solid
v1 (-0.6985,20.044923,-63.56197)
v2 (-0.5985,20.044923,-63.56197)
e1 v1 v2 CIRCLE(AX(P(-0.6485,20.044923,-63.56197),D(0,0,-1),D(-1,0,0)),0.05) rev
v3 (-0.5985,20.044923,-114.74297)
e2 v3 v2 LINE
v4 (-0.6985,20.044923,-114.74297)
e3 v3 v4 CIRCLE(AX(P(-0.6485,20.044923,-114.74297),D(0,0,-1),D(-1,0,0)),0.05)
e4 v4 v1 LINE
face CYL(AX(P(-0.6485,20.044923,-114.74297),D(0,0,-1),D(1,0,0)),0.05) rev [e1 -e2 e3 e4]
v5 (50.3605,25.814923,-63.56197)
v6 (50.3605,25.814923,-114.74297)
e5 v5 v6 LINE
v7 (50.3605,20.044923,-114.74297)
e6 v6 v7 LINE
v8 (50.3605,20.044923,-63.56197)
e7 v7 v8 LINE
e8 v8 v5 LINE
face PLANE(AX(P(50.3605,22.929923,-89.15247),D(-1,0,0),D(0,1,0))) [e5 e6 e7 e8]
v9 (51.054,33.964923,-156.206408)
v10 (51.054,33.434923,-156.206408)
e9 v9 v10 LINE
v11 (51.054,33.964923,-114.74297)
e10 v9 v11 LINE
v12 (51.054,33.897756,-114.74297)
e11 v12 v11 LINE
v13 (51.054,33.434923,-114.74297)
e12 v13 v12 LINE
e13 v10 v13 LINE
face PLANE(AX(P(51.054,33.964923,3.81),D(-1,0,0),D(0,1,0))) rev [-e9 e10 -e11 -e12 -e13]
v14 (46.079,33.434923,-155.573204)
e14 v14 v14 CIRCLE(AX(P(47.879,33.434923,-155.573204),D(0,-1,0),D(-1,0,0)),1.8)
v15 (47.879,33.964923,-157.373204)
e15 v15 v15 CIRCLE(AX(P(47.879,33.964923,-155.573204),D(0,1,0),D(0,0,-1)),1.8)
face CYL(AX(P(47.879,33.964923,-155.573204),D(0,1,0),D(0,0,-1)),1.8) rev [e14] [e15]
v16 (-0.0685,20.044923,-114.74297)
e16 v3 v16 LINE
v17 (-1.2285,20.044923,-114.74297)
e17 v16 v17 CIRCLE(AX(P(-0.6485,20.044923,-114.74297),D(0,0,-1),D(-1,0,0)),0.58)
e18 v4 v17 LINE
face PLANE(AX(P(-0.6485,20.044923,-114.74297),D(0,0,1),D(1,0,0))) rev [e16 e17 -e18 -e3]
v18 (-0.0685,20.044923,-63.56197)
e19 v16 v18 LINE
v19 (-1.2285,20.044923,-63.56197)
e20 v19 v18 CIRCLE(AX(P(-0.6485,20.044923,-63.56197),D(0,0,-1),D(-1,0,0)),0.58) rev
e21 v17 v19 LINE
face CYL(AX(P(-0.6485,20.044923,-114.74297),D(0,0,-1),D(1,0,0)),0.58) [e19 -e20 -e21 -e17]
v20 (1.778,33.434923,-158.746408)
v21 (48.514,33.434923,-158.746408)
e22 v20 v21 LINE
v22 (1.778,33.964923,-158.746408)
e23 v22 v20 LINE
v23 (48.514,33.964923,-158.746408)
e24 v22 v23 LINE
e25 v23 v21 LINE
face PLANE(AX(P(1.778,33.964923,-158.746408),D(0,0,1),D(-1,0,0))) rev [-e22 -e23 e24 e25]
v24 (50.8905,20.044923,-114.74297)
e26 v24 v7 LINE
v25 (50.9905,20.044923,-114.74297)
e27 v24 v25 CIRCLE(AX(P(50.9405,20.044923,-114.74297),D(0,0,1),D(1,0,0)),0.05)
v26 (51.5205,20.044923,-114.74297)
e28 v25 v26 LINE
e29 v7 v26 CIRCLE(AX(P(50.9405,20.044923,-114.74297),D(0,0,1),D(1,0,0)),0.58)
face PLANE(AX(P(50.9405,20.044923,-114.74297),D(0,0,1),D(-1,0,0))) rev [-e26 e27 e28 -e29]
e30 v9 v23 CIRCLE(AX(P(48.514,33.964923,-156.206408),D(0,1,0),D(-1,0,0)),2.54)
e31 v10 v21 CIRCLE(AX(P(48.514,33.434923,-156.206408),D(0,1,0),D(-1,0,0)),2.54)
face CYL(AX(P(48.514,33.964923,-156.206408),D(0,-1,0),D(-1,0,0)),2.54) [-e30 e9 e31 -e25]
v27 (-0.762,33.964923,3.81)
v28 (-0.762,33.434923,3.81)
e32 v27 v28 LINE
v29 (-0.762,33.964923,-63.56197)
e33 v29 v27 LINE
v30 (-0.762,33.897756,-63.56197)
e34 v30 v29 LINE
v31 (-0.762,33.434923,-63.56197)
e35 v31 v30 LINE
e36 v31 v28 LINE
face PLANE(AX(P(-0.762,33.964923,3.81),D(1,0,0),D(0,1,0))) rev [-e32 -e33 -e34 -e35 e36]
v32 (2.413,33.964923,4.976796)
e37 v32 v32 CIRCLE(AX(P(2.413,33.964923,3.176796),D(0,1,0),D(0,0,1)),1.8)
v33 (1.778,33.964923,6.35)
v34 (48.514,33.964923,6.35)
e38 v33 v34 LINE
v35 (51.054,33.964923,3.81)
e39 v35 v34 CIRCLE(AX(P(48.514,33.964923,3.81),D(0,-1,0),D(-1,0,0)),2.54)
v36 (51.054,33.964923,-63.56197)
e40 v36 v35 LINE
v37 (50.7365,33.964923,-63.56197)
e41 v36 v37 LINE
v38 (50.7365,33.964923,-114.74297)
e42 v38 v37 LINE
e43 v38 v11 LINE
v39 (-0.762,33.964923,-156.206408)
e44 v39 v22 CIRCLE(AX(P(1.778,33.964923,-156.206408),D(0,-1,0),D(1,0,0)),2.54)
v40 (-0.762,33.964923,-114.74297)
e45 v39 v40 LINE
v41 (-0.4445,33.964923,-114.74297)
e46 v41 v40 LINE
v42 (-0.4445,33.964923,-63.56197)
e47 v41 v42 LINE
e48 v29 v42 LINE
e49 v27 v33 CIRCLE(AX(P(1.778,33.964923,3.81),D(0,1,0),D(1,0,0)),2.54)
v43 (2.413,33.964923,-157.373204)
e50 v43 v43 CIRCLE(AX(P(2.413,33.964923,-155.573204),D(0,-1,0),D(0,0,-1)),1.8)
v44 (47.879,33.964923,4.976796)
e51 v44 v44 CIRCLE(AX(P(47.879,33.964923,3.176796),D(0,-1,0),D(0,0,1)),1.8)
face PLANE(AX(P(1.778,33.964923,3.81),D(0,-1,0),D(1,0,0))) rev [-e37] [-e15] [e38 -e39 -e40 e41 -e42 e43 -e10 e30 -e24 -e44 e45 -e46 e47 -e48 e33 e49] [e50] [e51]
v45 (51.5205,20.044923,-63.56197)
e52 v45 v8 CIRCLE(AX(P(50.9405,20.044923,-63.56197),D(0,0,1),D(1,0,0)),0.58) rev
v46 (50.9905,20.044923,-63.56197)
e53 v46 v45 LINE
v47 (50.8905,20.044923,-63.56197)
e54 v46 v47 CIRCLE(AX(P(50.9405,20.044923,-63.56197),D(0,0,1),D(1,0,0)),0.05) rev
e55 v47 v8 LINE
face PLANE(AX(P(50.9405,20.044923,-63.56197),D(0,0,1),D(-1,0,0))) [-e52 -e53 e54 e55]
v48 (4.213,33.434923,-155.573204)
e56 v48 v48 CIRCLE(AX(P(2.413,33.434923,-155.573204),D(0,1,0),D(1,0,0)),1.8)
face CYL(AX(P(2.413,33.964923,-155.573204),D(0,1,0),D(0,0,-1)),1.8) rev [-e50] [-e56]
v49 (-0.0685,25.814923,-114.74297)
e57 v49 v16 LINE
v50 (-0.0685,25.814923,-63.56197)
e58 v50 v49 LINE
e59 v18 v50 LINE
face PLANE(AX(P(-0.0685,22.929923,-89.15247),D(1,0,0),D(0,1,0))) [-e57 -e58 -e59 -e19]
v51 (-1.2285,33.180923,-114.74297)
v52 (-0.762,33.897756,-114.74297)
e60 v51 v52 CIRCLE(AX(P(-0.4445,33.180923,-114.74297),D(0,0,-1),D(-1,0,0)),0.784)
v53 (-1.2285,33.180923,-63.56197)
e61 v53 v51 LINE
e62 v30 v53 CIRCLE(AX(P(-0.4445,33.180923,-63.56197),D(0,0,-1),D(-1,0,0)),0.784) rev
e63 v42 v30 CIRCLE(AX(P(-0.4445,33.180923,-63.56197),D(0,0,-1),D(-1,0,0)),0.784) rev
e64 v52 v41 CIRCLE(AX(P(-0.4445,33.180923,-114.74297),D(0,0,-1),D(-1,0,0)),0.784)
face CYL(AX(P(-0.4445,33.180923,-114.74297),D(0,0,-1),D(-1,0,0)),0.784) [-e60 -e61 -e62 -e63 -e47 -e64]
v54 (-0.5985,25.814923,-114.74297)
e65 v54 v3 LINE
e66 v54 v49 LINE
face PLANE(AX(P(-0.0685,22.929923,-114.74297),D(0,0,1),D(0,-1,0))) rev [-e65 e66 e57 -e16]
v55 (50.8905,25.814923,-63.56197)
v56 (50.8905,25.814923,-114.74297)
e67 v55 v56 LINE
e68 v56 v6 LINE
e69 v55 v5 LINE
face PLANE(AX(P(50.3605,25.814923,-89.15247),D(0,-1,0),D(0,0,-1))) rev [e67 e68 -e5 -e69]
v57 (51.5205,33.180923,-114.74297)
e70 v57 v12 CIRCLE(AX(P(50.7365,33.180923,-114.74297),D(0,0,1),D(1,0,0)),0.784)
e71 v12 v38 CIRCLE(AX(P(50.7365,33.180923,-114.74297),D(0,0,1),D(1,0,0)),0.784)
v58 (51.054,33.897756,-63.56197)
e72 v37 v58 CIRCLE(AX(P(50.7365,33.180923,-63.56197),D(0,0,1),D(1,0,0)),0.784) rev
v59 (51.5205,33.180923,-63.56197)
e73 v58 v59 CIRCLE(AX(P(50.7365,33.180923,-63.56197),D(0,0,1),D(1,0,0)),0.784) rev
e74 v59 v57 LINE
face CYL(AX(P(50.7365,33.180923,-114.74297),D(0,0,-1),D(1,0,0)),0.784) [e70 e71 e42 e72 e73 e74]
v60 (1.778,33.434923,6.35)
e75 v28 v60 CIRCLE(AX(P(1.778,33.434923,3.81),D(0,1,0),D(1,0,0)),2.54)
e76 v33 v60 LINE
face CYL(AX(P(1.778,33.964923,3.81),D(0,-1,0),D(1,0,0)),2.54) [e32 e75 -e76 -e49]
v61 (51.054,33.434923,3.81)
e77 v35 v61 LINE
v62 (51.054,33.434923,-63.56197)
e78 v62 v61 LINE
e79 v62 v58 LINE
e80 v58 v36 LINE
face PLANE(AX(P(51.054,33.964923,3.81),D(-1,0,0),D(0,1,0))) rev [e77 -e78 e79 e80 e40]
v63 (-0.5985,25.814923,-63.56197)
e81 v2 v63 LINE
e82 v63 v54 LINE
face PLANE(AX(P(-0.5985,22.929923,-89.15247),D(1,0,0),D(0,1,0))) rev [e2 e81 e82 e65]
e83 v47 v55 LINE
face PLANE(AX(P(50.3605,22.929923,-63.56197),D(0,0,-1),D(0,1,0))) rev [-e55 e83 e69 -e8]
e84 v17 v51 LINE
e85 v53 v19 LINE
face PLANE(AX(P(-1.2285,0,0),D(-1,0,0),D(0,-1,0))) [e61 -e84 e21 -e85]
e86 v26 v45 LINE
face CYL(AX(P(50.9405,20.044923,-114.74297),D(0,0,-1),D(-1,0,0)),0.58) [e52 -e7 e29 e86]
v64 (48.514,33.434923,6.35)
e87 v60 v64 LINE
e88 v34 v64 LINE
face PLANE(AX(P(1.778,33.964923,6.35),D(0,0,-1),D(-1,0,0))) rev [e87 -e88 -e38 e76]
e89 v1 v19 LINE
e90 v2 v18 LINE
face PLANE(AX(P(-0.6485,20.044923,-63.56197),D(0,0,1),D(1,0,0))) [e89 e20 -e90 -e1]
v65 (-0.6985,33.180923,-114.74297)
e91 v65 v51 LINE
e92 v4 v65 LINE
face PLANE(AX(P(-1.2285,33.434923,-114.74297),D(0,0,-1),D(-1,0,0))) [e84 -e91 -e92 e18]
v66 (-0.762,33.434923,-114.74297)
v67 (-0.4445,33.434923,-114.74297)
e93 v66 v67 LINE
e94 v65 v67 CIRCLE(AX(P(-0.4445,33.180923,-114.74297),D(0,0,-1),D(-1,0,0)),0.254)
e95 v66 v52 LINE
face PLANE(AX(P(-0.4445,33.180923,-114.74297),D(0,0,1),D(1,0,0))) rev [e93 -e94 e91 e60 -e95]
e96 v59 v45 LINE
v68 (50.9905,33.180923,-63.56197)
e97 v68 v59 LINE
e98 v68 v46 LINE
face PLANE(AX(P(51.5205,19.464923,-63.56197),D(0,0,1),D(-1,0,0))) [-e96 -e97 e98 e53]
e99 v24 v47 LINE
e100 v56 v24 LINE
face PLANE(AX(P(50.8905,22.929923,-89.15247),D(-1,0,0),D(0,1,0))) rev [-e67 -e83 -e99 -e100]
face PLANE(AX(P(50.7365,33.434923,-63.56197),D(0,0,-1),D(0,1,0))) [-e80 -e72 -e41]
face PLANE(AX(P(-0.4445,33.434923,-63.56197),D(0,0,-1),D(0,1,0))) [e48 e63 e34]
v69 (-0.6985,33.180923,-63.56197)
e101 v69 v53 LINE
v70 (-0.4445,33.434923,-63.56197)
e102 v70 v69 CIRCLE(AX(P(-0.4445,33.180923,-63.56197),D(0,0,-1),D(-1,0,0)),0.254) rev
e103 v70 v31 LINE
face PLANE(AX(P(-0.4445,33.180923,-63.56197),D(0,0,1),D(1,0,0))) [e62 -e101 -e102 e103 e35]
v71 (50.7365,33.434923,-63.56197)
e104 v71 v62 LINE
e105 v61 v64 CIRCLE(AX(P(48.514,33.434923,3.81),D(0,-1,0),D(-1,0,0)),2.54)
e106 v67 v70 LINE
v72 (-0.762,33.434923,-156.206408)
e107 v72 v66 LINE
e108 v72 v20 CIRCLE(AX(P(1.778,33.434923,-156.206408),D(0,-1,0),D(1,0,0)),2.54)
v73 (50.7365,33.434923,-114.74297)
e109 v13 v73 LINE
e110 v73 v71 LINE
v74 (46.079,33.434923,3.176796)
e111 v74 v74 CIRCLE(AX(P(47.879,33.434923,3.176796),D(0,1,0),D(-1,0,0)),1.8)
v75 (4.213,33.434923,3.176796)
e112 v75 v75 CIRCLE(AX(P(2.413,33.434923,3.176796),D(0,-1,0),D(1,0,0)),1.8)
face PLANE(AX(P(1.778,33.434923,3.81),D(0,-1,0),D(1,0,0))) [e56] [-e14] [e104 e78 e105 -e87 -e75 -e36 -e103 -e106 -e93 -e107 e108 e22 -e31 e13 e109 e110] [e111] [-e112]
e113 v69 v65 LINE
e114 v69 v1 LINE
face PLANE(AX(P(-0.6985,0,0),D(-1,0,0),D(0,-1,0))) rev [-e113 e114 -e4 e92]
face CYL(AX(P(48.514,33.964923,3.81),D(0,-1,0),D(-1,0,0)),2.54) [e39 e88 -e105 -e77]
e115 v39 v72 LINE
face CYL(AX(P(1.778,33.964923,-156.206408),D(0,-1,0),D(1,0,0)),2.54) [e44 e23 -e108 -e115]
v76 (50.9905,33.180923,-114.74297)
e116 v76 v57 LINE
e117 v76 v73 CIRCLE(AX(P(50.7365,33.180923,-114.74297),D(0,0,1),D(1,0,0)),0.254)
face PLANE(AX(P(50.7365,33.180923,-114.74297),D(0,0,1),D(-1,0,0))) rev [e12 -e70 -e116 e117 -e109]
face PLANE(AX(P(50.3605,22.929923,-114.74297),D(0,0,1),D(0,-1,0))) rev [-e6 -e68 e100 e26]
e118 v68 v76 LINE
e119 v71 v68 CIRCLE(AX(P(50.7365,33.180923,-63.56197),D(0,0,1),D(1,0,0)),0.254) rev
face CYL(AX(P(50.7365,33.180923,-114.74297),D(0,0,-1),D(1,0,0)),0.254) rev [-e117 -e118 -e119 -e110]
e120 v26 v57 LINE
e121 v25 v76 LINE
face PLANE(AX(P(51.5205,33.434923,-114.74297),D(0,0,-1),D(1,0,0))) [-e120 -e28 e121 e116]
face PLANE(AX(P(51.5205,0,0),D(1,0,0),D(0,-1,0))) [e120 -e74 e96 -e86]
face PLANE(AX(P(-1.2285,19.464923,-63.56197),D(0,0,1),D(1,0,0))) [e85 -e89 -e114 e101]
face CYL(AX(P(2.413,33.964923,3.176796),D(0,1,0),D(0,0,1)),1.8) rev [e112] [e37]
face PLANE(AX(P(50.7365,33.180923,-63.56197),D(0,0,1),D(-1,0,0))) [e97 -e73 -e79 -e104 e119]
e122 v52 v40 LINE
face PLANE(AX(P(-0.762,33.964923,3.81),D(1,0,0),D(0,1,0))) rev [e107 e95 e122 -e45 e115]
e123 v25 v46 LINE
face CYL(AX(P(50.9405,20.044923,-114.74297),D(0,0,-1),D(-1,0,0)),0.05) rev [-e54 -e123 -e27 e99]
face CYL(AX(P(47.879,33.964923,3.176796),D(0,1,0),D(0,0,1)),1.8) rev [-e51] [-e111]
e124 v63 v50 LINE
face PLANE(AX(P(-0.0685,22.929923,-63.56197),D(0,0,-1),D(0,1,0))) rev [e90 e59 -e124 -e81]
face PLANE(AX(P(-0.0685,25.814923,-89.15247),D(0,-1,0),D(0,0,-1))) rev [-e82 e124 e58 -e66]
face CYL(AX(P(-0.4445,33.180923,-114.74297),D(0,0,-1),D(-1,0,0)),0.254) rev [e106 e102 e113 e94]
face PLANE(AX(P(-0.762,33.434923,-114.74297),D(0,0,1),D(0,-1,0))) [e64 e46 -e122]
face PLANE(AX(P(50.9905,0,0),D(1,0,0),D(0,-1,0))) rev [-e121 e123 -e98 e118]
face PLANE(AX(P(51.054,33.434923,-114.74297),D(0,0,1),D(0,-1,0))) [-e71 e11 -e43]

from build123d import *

# Parameters (mm, degrees)
BASE_FLANGE1_DEPTH           = 0.53
M3_CLEARANCE_HOLE1_D         = 3.6
EDGE_FLANGE1_STRIP_W         = 2.6915
EDGE_FLANGE1_STRIP_H         = 0.53
EDGE_FLANGE1_STRIP_CUT_DEPTH = 51.181
EDGE_FLANGE1_DEPTH           = 51.181
HEM1_START                   = -114.74296965
HEM1_DEPTH                   = 51.181
HEM1_2_DEPTH                 = 51.181


# Read off the part's stored shape, not the designer's step: Hem1
# Sheet-metal steps are written as plain solids
with BuildPart() as part:
    # Sketch1 → Base-Flange1 (new body)
    with BuildSketch(Plane(origin=(0, 33.434923007, 0), x_dir=(1, 0, 0), z_dir=(0, 1, 0))):
        with BuildLine():
            Line((1.778, -6.350000017), (25.146, -6.350000017))
            Line((25.146, -6.350000017), (25.146, 76.198203949))
            Line((25.146, 76.198203949), (-0.762, 76.198203949))
            Line((-0.762, 76.198203949), (-0.762, -3.810000017))
            ThreePointArc((-0.762, -3.810000017), (-0.018051224, -5.606051241), (1.778, -6.350000017))
        make_face()
    extrude(amount=BASE_FLANGE1_DEPTH)

    # M3 Clearance Hole1 (through all)
    with Locations(Plane(origin=(0, 33.964923007, 0), x_dir=(1, 0, 0), z_dir=(0, 1, 0))):
        with Locations((2.413, -3.176796068)):
            Hole(M3_CLEARANCE_HOLE1_D / 2)

    # Mirror1: part across plane


with BuildPart() as part_1:
    add(part.part)
    add(part.part.mirror(Plane(origin=(-0.762, 33.964923007, -76.198203949), x_dir=(1, 0, 0), z_dir=(0, 0, 1))))

    # Edge-Flange1 strip (across the edge) → Edge-Flange1 strip cut (cut)
    with BuildSketch(Plane(origin=(-0.6985, 33.434923007, -63.56196965), x_dir=(1, 0, 0), z_dir=(0, 0, -1))):
        with Locations((-1.09175, -0.265)):
            Rectangle(EDGE_FLANGE1_STRIP_W, EDGE_FLANGE1_STRIP_H)
    extrude(amount=EDGE_FLANGE1_STRIP_CUT_DEPTH, mode=Mode.SUBTRACT)

    # Edge-Flange1 section (across the edge) → Edge-Flange1 (add)
    with BuildSketch(Plane(origin=(-0.6985, 33.434923007, -63.56196965), x_dir=(1, 0, 0), z_dir=(0, 0, -1))):
        with BuildLine():
            Line((-0.53, 0.254), (-0.53, 13.97))
            Line((-0.53, 13.97), (0, 13.97))
            Line((0, 13.97), (0, 0.254))
            ThreePointArc((0, 0.254), (0.074394878, 0.074394878), (0.254, 0))
            Line((0.254, 0), (0.254, -0.53))
            ThreePointArc((0.254, -0.53), (-0.300371716, -0.300371716), (-0.53, 0.254))
        make_face()
    extrude(amount=EDGE_FLANGE1_DEPTH)

    # Hem1 outline → Hem1 (cut)
    with BuildSketch(Plane.XY.offset(HEM1_START)):
        with BuildLine():
            Line((-0.6985, 19.464923007), (-0.6985, 19.467082198))
            ThreePointArc((-0.6985, 19.467082198), (-1.075934205, 19.652877091), (-1.2285, 20.044923007))
            Line((-1.2285, 20.044923007), (-1.2285, 19.464923007))
            Line((-1.2285, 19.464923007), (-0.6985, 19.464923007))
        make_face()
    extrude(amount=HEM1_DEPTH, mode=Mode.SUBTRACT)

    # Hem1 2 outline → Hem1 2 (add)
    with BuildSketch(Plane.XY.offset(HEM1_START)):
        with BuildLine():
            Line((-0.0685, 25.814923007), (-0.5985, 25.814923007))
            Line((-0.5985, 25.814923007), (-0.5985, 20.044923007))
            ThreePointArc((-0.5985, 20.044923007), (-0.6485, 19.994923007), (-0.6985, 20.044923007))
            Line((-0.6985, 20.044923007), (-0.6985, 19.467082198))
            ThreePointArc((-0.6985, 19.467082198), (-0.256454084, 19.617488802), (-0.0685, 20.044923007))
            Line((-0.0685, 20.044923007), (-0.0685, 25.814923007))
        make_face()
    extrude(amount=HEM1_2_DEPTH)

    # Mirror2: part across face


with BuildPart() as part_2:
    add(part_1.part)
    add(part_1.part.mirror(Plane(origin=(25.146, 33.699923007, -76.198203949), x_dir=(0, 0, 1), z_dir=(1, 0, 0))))


solid = part_2.part
